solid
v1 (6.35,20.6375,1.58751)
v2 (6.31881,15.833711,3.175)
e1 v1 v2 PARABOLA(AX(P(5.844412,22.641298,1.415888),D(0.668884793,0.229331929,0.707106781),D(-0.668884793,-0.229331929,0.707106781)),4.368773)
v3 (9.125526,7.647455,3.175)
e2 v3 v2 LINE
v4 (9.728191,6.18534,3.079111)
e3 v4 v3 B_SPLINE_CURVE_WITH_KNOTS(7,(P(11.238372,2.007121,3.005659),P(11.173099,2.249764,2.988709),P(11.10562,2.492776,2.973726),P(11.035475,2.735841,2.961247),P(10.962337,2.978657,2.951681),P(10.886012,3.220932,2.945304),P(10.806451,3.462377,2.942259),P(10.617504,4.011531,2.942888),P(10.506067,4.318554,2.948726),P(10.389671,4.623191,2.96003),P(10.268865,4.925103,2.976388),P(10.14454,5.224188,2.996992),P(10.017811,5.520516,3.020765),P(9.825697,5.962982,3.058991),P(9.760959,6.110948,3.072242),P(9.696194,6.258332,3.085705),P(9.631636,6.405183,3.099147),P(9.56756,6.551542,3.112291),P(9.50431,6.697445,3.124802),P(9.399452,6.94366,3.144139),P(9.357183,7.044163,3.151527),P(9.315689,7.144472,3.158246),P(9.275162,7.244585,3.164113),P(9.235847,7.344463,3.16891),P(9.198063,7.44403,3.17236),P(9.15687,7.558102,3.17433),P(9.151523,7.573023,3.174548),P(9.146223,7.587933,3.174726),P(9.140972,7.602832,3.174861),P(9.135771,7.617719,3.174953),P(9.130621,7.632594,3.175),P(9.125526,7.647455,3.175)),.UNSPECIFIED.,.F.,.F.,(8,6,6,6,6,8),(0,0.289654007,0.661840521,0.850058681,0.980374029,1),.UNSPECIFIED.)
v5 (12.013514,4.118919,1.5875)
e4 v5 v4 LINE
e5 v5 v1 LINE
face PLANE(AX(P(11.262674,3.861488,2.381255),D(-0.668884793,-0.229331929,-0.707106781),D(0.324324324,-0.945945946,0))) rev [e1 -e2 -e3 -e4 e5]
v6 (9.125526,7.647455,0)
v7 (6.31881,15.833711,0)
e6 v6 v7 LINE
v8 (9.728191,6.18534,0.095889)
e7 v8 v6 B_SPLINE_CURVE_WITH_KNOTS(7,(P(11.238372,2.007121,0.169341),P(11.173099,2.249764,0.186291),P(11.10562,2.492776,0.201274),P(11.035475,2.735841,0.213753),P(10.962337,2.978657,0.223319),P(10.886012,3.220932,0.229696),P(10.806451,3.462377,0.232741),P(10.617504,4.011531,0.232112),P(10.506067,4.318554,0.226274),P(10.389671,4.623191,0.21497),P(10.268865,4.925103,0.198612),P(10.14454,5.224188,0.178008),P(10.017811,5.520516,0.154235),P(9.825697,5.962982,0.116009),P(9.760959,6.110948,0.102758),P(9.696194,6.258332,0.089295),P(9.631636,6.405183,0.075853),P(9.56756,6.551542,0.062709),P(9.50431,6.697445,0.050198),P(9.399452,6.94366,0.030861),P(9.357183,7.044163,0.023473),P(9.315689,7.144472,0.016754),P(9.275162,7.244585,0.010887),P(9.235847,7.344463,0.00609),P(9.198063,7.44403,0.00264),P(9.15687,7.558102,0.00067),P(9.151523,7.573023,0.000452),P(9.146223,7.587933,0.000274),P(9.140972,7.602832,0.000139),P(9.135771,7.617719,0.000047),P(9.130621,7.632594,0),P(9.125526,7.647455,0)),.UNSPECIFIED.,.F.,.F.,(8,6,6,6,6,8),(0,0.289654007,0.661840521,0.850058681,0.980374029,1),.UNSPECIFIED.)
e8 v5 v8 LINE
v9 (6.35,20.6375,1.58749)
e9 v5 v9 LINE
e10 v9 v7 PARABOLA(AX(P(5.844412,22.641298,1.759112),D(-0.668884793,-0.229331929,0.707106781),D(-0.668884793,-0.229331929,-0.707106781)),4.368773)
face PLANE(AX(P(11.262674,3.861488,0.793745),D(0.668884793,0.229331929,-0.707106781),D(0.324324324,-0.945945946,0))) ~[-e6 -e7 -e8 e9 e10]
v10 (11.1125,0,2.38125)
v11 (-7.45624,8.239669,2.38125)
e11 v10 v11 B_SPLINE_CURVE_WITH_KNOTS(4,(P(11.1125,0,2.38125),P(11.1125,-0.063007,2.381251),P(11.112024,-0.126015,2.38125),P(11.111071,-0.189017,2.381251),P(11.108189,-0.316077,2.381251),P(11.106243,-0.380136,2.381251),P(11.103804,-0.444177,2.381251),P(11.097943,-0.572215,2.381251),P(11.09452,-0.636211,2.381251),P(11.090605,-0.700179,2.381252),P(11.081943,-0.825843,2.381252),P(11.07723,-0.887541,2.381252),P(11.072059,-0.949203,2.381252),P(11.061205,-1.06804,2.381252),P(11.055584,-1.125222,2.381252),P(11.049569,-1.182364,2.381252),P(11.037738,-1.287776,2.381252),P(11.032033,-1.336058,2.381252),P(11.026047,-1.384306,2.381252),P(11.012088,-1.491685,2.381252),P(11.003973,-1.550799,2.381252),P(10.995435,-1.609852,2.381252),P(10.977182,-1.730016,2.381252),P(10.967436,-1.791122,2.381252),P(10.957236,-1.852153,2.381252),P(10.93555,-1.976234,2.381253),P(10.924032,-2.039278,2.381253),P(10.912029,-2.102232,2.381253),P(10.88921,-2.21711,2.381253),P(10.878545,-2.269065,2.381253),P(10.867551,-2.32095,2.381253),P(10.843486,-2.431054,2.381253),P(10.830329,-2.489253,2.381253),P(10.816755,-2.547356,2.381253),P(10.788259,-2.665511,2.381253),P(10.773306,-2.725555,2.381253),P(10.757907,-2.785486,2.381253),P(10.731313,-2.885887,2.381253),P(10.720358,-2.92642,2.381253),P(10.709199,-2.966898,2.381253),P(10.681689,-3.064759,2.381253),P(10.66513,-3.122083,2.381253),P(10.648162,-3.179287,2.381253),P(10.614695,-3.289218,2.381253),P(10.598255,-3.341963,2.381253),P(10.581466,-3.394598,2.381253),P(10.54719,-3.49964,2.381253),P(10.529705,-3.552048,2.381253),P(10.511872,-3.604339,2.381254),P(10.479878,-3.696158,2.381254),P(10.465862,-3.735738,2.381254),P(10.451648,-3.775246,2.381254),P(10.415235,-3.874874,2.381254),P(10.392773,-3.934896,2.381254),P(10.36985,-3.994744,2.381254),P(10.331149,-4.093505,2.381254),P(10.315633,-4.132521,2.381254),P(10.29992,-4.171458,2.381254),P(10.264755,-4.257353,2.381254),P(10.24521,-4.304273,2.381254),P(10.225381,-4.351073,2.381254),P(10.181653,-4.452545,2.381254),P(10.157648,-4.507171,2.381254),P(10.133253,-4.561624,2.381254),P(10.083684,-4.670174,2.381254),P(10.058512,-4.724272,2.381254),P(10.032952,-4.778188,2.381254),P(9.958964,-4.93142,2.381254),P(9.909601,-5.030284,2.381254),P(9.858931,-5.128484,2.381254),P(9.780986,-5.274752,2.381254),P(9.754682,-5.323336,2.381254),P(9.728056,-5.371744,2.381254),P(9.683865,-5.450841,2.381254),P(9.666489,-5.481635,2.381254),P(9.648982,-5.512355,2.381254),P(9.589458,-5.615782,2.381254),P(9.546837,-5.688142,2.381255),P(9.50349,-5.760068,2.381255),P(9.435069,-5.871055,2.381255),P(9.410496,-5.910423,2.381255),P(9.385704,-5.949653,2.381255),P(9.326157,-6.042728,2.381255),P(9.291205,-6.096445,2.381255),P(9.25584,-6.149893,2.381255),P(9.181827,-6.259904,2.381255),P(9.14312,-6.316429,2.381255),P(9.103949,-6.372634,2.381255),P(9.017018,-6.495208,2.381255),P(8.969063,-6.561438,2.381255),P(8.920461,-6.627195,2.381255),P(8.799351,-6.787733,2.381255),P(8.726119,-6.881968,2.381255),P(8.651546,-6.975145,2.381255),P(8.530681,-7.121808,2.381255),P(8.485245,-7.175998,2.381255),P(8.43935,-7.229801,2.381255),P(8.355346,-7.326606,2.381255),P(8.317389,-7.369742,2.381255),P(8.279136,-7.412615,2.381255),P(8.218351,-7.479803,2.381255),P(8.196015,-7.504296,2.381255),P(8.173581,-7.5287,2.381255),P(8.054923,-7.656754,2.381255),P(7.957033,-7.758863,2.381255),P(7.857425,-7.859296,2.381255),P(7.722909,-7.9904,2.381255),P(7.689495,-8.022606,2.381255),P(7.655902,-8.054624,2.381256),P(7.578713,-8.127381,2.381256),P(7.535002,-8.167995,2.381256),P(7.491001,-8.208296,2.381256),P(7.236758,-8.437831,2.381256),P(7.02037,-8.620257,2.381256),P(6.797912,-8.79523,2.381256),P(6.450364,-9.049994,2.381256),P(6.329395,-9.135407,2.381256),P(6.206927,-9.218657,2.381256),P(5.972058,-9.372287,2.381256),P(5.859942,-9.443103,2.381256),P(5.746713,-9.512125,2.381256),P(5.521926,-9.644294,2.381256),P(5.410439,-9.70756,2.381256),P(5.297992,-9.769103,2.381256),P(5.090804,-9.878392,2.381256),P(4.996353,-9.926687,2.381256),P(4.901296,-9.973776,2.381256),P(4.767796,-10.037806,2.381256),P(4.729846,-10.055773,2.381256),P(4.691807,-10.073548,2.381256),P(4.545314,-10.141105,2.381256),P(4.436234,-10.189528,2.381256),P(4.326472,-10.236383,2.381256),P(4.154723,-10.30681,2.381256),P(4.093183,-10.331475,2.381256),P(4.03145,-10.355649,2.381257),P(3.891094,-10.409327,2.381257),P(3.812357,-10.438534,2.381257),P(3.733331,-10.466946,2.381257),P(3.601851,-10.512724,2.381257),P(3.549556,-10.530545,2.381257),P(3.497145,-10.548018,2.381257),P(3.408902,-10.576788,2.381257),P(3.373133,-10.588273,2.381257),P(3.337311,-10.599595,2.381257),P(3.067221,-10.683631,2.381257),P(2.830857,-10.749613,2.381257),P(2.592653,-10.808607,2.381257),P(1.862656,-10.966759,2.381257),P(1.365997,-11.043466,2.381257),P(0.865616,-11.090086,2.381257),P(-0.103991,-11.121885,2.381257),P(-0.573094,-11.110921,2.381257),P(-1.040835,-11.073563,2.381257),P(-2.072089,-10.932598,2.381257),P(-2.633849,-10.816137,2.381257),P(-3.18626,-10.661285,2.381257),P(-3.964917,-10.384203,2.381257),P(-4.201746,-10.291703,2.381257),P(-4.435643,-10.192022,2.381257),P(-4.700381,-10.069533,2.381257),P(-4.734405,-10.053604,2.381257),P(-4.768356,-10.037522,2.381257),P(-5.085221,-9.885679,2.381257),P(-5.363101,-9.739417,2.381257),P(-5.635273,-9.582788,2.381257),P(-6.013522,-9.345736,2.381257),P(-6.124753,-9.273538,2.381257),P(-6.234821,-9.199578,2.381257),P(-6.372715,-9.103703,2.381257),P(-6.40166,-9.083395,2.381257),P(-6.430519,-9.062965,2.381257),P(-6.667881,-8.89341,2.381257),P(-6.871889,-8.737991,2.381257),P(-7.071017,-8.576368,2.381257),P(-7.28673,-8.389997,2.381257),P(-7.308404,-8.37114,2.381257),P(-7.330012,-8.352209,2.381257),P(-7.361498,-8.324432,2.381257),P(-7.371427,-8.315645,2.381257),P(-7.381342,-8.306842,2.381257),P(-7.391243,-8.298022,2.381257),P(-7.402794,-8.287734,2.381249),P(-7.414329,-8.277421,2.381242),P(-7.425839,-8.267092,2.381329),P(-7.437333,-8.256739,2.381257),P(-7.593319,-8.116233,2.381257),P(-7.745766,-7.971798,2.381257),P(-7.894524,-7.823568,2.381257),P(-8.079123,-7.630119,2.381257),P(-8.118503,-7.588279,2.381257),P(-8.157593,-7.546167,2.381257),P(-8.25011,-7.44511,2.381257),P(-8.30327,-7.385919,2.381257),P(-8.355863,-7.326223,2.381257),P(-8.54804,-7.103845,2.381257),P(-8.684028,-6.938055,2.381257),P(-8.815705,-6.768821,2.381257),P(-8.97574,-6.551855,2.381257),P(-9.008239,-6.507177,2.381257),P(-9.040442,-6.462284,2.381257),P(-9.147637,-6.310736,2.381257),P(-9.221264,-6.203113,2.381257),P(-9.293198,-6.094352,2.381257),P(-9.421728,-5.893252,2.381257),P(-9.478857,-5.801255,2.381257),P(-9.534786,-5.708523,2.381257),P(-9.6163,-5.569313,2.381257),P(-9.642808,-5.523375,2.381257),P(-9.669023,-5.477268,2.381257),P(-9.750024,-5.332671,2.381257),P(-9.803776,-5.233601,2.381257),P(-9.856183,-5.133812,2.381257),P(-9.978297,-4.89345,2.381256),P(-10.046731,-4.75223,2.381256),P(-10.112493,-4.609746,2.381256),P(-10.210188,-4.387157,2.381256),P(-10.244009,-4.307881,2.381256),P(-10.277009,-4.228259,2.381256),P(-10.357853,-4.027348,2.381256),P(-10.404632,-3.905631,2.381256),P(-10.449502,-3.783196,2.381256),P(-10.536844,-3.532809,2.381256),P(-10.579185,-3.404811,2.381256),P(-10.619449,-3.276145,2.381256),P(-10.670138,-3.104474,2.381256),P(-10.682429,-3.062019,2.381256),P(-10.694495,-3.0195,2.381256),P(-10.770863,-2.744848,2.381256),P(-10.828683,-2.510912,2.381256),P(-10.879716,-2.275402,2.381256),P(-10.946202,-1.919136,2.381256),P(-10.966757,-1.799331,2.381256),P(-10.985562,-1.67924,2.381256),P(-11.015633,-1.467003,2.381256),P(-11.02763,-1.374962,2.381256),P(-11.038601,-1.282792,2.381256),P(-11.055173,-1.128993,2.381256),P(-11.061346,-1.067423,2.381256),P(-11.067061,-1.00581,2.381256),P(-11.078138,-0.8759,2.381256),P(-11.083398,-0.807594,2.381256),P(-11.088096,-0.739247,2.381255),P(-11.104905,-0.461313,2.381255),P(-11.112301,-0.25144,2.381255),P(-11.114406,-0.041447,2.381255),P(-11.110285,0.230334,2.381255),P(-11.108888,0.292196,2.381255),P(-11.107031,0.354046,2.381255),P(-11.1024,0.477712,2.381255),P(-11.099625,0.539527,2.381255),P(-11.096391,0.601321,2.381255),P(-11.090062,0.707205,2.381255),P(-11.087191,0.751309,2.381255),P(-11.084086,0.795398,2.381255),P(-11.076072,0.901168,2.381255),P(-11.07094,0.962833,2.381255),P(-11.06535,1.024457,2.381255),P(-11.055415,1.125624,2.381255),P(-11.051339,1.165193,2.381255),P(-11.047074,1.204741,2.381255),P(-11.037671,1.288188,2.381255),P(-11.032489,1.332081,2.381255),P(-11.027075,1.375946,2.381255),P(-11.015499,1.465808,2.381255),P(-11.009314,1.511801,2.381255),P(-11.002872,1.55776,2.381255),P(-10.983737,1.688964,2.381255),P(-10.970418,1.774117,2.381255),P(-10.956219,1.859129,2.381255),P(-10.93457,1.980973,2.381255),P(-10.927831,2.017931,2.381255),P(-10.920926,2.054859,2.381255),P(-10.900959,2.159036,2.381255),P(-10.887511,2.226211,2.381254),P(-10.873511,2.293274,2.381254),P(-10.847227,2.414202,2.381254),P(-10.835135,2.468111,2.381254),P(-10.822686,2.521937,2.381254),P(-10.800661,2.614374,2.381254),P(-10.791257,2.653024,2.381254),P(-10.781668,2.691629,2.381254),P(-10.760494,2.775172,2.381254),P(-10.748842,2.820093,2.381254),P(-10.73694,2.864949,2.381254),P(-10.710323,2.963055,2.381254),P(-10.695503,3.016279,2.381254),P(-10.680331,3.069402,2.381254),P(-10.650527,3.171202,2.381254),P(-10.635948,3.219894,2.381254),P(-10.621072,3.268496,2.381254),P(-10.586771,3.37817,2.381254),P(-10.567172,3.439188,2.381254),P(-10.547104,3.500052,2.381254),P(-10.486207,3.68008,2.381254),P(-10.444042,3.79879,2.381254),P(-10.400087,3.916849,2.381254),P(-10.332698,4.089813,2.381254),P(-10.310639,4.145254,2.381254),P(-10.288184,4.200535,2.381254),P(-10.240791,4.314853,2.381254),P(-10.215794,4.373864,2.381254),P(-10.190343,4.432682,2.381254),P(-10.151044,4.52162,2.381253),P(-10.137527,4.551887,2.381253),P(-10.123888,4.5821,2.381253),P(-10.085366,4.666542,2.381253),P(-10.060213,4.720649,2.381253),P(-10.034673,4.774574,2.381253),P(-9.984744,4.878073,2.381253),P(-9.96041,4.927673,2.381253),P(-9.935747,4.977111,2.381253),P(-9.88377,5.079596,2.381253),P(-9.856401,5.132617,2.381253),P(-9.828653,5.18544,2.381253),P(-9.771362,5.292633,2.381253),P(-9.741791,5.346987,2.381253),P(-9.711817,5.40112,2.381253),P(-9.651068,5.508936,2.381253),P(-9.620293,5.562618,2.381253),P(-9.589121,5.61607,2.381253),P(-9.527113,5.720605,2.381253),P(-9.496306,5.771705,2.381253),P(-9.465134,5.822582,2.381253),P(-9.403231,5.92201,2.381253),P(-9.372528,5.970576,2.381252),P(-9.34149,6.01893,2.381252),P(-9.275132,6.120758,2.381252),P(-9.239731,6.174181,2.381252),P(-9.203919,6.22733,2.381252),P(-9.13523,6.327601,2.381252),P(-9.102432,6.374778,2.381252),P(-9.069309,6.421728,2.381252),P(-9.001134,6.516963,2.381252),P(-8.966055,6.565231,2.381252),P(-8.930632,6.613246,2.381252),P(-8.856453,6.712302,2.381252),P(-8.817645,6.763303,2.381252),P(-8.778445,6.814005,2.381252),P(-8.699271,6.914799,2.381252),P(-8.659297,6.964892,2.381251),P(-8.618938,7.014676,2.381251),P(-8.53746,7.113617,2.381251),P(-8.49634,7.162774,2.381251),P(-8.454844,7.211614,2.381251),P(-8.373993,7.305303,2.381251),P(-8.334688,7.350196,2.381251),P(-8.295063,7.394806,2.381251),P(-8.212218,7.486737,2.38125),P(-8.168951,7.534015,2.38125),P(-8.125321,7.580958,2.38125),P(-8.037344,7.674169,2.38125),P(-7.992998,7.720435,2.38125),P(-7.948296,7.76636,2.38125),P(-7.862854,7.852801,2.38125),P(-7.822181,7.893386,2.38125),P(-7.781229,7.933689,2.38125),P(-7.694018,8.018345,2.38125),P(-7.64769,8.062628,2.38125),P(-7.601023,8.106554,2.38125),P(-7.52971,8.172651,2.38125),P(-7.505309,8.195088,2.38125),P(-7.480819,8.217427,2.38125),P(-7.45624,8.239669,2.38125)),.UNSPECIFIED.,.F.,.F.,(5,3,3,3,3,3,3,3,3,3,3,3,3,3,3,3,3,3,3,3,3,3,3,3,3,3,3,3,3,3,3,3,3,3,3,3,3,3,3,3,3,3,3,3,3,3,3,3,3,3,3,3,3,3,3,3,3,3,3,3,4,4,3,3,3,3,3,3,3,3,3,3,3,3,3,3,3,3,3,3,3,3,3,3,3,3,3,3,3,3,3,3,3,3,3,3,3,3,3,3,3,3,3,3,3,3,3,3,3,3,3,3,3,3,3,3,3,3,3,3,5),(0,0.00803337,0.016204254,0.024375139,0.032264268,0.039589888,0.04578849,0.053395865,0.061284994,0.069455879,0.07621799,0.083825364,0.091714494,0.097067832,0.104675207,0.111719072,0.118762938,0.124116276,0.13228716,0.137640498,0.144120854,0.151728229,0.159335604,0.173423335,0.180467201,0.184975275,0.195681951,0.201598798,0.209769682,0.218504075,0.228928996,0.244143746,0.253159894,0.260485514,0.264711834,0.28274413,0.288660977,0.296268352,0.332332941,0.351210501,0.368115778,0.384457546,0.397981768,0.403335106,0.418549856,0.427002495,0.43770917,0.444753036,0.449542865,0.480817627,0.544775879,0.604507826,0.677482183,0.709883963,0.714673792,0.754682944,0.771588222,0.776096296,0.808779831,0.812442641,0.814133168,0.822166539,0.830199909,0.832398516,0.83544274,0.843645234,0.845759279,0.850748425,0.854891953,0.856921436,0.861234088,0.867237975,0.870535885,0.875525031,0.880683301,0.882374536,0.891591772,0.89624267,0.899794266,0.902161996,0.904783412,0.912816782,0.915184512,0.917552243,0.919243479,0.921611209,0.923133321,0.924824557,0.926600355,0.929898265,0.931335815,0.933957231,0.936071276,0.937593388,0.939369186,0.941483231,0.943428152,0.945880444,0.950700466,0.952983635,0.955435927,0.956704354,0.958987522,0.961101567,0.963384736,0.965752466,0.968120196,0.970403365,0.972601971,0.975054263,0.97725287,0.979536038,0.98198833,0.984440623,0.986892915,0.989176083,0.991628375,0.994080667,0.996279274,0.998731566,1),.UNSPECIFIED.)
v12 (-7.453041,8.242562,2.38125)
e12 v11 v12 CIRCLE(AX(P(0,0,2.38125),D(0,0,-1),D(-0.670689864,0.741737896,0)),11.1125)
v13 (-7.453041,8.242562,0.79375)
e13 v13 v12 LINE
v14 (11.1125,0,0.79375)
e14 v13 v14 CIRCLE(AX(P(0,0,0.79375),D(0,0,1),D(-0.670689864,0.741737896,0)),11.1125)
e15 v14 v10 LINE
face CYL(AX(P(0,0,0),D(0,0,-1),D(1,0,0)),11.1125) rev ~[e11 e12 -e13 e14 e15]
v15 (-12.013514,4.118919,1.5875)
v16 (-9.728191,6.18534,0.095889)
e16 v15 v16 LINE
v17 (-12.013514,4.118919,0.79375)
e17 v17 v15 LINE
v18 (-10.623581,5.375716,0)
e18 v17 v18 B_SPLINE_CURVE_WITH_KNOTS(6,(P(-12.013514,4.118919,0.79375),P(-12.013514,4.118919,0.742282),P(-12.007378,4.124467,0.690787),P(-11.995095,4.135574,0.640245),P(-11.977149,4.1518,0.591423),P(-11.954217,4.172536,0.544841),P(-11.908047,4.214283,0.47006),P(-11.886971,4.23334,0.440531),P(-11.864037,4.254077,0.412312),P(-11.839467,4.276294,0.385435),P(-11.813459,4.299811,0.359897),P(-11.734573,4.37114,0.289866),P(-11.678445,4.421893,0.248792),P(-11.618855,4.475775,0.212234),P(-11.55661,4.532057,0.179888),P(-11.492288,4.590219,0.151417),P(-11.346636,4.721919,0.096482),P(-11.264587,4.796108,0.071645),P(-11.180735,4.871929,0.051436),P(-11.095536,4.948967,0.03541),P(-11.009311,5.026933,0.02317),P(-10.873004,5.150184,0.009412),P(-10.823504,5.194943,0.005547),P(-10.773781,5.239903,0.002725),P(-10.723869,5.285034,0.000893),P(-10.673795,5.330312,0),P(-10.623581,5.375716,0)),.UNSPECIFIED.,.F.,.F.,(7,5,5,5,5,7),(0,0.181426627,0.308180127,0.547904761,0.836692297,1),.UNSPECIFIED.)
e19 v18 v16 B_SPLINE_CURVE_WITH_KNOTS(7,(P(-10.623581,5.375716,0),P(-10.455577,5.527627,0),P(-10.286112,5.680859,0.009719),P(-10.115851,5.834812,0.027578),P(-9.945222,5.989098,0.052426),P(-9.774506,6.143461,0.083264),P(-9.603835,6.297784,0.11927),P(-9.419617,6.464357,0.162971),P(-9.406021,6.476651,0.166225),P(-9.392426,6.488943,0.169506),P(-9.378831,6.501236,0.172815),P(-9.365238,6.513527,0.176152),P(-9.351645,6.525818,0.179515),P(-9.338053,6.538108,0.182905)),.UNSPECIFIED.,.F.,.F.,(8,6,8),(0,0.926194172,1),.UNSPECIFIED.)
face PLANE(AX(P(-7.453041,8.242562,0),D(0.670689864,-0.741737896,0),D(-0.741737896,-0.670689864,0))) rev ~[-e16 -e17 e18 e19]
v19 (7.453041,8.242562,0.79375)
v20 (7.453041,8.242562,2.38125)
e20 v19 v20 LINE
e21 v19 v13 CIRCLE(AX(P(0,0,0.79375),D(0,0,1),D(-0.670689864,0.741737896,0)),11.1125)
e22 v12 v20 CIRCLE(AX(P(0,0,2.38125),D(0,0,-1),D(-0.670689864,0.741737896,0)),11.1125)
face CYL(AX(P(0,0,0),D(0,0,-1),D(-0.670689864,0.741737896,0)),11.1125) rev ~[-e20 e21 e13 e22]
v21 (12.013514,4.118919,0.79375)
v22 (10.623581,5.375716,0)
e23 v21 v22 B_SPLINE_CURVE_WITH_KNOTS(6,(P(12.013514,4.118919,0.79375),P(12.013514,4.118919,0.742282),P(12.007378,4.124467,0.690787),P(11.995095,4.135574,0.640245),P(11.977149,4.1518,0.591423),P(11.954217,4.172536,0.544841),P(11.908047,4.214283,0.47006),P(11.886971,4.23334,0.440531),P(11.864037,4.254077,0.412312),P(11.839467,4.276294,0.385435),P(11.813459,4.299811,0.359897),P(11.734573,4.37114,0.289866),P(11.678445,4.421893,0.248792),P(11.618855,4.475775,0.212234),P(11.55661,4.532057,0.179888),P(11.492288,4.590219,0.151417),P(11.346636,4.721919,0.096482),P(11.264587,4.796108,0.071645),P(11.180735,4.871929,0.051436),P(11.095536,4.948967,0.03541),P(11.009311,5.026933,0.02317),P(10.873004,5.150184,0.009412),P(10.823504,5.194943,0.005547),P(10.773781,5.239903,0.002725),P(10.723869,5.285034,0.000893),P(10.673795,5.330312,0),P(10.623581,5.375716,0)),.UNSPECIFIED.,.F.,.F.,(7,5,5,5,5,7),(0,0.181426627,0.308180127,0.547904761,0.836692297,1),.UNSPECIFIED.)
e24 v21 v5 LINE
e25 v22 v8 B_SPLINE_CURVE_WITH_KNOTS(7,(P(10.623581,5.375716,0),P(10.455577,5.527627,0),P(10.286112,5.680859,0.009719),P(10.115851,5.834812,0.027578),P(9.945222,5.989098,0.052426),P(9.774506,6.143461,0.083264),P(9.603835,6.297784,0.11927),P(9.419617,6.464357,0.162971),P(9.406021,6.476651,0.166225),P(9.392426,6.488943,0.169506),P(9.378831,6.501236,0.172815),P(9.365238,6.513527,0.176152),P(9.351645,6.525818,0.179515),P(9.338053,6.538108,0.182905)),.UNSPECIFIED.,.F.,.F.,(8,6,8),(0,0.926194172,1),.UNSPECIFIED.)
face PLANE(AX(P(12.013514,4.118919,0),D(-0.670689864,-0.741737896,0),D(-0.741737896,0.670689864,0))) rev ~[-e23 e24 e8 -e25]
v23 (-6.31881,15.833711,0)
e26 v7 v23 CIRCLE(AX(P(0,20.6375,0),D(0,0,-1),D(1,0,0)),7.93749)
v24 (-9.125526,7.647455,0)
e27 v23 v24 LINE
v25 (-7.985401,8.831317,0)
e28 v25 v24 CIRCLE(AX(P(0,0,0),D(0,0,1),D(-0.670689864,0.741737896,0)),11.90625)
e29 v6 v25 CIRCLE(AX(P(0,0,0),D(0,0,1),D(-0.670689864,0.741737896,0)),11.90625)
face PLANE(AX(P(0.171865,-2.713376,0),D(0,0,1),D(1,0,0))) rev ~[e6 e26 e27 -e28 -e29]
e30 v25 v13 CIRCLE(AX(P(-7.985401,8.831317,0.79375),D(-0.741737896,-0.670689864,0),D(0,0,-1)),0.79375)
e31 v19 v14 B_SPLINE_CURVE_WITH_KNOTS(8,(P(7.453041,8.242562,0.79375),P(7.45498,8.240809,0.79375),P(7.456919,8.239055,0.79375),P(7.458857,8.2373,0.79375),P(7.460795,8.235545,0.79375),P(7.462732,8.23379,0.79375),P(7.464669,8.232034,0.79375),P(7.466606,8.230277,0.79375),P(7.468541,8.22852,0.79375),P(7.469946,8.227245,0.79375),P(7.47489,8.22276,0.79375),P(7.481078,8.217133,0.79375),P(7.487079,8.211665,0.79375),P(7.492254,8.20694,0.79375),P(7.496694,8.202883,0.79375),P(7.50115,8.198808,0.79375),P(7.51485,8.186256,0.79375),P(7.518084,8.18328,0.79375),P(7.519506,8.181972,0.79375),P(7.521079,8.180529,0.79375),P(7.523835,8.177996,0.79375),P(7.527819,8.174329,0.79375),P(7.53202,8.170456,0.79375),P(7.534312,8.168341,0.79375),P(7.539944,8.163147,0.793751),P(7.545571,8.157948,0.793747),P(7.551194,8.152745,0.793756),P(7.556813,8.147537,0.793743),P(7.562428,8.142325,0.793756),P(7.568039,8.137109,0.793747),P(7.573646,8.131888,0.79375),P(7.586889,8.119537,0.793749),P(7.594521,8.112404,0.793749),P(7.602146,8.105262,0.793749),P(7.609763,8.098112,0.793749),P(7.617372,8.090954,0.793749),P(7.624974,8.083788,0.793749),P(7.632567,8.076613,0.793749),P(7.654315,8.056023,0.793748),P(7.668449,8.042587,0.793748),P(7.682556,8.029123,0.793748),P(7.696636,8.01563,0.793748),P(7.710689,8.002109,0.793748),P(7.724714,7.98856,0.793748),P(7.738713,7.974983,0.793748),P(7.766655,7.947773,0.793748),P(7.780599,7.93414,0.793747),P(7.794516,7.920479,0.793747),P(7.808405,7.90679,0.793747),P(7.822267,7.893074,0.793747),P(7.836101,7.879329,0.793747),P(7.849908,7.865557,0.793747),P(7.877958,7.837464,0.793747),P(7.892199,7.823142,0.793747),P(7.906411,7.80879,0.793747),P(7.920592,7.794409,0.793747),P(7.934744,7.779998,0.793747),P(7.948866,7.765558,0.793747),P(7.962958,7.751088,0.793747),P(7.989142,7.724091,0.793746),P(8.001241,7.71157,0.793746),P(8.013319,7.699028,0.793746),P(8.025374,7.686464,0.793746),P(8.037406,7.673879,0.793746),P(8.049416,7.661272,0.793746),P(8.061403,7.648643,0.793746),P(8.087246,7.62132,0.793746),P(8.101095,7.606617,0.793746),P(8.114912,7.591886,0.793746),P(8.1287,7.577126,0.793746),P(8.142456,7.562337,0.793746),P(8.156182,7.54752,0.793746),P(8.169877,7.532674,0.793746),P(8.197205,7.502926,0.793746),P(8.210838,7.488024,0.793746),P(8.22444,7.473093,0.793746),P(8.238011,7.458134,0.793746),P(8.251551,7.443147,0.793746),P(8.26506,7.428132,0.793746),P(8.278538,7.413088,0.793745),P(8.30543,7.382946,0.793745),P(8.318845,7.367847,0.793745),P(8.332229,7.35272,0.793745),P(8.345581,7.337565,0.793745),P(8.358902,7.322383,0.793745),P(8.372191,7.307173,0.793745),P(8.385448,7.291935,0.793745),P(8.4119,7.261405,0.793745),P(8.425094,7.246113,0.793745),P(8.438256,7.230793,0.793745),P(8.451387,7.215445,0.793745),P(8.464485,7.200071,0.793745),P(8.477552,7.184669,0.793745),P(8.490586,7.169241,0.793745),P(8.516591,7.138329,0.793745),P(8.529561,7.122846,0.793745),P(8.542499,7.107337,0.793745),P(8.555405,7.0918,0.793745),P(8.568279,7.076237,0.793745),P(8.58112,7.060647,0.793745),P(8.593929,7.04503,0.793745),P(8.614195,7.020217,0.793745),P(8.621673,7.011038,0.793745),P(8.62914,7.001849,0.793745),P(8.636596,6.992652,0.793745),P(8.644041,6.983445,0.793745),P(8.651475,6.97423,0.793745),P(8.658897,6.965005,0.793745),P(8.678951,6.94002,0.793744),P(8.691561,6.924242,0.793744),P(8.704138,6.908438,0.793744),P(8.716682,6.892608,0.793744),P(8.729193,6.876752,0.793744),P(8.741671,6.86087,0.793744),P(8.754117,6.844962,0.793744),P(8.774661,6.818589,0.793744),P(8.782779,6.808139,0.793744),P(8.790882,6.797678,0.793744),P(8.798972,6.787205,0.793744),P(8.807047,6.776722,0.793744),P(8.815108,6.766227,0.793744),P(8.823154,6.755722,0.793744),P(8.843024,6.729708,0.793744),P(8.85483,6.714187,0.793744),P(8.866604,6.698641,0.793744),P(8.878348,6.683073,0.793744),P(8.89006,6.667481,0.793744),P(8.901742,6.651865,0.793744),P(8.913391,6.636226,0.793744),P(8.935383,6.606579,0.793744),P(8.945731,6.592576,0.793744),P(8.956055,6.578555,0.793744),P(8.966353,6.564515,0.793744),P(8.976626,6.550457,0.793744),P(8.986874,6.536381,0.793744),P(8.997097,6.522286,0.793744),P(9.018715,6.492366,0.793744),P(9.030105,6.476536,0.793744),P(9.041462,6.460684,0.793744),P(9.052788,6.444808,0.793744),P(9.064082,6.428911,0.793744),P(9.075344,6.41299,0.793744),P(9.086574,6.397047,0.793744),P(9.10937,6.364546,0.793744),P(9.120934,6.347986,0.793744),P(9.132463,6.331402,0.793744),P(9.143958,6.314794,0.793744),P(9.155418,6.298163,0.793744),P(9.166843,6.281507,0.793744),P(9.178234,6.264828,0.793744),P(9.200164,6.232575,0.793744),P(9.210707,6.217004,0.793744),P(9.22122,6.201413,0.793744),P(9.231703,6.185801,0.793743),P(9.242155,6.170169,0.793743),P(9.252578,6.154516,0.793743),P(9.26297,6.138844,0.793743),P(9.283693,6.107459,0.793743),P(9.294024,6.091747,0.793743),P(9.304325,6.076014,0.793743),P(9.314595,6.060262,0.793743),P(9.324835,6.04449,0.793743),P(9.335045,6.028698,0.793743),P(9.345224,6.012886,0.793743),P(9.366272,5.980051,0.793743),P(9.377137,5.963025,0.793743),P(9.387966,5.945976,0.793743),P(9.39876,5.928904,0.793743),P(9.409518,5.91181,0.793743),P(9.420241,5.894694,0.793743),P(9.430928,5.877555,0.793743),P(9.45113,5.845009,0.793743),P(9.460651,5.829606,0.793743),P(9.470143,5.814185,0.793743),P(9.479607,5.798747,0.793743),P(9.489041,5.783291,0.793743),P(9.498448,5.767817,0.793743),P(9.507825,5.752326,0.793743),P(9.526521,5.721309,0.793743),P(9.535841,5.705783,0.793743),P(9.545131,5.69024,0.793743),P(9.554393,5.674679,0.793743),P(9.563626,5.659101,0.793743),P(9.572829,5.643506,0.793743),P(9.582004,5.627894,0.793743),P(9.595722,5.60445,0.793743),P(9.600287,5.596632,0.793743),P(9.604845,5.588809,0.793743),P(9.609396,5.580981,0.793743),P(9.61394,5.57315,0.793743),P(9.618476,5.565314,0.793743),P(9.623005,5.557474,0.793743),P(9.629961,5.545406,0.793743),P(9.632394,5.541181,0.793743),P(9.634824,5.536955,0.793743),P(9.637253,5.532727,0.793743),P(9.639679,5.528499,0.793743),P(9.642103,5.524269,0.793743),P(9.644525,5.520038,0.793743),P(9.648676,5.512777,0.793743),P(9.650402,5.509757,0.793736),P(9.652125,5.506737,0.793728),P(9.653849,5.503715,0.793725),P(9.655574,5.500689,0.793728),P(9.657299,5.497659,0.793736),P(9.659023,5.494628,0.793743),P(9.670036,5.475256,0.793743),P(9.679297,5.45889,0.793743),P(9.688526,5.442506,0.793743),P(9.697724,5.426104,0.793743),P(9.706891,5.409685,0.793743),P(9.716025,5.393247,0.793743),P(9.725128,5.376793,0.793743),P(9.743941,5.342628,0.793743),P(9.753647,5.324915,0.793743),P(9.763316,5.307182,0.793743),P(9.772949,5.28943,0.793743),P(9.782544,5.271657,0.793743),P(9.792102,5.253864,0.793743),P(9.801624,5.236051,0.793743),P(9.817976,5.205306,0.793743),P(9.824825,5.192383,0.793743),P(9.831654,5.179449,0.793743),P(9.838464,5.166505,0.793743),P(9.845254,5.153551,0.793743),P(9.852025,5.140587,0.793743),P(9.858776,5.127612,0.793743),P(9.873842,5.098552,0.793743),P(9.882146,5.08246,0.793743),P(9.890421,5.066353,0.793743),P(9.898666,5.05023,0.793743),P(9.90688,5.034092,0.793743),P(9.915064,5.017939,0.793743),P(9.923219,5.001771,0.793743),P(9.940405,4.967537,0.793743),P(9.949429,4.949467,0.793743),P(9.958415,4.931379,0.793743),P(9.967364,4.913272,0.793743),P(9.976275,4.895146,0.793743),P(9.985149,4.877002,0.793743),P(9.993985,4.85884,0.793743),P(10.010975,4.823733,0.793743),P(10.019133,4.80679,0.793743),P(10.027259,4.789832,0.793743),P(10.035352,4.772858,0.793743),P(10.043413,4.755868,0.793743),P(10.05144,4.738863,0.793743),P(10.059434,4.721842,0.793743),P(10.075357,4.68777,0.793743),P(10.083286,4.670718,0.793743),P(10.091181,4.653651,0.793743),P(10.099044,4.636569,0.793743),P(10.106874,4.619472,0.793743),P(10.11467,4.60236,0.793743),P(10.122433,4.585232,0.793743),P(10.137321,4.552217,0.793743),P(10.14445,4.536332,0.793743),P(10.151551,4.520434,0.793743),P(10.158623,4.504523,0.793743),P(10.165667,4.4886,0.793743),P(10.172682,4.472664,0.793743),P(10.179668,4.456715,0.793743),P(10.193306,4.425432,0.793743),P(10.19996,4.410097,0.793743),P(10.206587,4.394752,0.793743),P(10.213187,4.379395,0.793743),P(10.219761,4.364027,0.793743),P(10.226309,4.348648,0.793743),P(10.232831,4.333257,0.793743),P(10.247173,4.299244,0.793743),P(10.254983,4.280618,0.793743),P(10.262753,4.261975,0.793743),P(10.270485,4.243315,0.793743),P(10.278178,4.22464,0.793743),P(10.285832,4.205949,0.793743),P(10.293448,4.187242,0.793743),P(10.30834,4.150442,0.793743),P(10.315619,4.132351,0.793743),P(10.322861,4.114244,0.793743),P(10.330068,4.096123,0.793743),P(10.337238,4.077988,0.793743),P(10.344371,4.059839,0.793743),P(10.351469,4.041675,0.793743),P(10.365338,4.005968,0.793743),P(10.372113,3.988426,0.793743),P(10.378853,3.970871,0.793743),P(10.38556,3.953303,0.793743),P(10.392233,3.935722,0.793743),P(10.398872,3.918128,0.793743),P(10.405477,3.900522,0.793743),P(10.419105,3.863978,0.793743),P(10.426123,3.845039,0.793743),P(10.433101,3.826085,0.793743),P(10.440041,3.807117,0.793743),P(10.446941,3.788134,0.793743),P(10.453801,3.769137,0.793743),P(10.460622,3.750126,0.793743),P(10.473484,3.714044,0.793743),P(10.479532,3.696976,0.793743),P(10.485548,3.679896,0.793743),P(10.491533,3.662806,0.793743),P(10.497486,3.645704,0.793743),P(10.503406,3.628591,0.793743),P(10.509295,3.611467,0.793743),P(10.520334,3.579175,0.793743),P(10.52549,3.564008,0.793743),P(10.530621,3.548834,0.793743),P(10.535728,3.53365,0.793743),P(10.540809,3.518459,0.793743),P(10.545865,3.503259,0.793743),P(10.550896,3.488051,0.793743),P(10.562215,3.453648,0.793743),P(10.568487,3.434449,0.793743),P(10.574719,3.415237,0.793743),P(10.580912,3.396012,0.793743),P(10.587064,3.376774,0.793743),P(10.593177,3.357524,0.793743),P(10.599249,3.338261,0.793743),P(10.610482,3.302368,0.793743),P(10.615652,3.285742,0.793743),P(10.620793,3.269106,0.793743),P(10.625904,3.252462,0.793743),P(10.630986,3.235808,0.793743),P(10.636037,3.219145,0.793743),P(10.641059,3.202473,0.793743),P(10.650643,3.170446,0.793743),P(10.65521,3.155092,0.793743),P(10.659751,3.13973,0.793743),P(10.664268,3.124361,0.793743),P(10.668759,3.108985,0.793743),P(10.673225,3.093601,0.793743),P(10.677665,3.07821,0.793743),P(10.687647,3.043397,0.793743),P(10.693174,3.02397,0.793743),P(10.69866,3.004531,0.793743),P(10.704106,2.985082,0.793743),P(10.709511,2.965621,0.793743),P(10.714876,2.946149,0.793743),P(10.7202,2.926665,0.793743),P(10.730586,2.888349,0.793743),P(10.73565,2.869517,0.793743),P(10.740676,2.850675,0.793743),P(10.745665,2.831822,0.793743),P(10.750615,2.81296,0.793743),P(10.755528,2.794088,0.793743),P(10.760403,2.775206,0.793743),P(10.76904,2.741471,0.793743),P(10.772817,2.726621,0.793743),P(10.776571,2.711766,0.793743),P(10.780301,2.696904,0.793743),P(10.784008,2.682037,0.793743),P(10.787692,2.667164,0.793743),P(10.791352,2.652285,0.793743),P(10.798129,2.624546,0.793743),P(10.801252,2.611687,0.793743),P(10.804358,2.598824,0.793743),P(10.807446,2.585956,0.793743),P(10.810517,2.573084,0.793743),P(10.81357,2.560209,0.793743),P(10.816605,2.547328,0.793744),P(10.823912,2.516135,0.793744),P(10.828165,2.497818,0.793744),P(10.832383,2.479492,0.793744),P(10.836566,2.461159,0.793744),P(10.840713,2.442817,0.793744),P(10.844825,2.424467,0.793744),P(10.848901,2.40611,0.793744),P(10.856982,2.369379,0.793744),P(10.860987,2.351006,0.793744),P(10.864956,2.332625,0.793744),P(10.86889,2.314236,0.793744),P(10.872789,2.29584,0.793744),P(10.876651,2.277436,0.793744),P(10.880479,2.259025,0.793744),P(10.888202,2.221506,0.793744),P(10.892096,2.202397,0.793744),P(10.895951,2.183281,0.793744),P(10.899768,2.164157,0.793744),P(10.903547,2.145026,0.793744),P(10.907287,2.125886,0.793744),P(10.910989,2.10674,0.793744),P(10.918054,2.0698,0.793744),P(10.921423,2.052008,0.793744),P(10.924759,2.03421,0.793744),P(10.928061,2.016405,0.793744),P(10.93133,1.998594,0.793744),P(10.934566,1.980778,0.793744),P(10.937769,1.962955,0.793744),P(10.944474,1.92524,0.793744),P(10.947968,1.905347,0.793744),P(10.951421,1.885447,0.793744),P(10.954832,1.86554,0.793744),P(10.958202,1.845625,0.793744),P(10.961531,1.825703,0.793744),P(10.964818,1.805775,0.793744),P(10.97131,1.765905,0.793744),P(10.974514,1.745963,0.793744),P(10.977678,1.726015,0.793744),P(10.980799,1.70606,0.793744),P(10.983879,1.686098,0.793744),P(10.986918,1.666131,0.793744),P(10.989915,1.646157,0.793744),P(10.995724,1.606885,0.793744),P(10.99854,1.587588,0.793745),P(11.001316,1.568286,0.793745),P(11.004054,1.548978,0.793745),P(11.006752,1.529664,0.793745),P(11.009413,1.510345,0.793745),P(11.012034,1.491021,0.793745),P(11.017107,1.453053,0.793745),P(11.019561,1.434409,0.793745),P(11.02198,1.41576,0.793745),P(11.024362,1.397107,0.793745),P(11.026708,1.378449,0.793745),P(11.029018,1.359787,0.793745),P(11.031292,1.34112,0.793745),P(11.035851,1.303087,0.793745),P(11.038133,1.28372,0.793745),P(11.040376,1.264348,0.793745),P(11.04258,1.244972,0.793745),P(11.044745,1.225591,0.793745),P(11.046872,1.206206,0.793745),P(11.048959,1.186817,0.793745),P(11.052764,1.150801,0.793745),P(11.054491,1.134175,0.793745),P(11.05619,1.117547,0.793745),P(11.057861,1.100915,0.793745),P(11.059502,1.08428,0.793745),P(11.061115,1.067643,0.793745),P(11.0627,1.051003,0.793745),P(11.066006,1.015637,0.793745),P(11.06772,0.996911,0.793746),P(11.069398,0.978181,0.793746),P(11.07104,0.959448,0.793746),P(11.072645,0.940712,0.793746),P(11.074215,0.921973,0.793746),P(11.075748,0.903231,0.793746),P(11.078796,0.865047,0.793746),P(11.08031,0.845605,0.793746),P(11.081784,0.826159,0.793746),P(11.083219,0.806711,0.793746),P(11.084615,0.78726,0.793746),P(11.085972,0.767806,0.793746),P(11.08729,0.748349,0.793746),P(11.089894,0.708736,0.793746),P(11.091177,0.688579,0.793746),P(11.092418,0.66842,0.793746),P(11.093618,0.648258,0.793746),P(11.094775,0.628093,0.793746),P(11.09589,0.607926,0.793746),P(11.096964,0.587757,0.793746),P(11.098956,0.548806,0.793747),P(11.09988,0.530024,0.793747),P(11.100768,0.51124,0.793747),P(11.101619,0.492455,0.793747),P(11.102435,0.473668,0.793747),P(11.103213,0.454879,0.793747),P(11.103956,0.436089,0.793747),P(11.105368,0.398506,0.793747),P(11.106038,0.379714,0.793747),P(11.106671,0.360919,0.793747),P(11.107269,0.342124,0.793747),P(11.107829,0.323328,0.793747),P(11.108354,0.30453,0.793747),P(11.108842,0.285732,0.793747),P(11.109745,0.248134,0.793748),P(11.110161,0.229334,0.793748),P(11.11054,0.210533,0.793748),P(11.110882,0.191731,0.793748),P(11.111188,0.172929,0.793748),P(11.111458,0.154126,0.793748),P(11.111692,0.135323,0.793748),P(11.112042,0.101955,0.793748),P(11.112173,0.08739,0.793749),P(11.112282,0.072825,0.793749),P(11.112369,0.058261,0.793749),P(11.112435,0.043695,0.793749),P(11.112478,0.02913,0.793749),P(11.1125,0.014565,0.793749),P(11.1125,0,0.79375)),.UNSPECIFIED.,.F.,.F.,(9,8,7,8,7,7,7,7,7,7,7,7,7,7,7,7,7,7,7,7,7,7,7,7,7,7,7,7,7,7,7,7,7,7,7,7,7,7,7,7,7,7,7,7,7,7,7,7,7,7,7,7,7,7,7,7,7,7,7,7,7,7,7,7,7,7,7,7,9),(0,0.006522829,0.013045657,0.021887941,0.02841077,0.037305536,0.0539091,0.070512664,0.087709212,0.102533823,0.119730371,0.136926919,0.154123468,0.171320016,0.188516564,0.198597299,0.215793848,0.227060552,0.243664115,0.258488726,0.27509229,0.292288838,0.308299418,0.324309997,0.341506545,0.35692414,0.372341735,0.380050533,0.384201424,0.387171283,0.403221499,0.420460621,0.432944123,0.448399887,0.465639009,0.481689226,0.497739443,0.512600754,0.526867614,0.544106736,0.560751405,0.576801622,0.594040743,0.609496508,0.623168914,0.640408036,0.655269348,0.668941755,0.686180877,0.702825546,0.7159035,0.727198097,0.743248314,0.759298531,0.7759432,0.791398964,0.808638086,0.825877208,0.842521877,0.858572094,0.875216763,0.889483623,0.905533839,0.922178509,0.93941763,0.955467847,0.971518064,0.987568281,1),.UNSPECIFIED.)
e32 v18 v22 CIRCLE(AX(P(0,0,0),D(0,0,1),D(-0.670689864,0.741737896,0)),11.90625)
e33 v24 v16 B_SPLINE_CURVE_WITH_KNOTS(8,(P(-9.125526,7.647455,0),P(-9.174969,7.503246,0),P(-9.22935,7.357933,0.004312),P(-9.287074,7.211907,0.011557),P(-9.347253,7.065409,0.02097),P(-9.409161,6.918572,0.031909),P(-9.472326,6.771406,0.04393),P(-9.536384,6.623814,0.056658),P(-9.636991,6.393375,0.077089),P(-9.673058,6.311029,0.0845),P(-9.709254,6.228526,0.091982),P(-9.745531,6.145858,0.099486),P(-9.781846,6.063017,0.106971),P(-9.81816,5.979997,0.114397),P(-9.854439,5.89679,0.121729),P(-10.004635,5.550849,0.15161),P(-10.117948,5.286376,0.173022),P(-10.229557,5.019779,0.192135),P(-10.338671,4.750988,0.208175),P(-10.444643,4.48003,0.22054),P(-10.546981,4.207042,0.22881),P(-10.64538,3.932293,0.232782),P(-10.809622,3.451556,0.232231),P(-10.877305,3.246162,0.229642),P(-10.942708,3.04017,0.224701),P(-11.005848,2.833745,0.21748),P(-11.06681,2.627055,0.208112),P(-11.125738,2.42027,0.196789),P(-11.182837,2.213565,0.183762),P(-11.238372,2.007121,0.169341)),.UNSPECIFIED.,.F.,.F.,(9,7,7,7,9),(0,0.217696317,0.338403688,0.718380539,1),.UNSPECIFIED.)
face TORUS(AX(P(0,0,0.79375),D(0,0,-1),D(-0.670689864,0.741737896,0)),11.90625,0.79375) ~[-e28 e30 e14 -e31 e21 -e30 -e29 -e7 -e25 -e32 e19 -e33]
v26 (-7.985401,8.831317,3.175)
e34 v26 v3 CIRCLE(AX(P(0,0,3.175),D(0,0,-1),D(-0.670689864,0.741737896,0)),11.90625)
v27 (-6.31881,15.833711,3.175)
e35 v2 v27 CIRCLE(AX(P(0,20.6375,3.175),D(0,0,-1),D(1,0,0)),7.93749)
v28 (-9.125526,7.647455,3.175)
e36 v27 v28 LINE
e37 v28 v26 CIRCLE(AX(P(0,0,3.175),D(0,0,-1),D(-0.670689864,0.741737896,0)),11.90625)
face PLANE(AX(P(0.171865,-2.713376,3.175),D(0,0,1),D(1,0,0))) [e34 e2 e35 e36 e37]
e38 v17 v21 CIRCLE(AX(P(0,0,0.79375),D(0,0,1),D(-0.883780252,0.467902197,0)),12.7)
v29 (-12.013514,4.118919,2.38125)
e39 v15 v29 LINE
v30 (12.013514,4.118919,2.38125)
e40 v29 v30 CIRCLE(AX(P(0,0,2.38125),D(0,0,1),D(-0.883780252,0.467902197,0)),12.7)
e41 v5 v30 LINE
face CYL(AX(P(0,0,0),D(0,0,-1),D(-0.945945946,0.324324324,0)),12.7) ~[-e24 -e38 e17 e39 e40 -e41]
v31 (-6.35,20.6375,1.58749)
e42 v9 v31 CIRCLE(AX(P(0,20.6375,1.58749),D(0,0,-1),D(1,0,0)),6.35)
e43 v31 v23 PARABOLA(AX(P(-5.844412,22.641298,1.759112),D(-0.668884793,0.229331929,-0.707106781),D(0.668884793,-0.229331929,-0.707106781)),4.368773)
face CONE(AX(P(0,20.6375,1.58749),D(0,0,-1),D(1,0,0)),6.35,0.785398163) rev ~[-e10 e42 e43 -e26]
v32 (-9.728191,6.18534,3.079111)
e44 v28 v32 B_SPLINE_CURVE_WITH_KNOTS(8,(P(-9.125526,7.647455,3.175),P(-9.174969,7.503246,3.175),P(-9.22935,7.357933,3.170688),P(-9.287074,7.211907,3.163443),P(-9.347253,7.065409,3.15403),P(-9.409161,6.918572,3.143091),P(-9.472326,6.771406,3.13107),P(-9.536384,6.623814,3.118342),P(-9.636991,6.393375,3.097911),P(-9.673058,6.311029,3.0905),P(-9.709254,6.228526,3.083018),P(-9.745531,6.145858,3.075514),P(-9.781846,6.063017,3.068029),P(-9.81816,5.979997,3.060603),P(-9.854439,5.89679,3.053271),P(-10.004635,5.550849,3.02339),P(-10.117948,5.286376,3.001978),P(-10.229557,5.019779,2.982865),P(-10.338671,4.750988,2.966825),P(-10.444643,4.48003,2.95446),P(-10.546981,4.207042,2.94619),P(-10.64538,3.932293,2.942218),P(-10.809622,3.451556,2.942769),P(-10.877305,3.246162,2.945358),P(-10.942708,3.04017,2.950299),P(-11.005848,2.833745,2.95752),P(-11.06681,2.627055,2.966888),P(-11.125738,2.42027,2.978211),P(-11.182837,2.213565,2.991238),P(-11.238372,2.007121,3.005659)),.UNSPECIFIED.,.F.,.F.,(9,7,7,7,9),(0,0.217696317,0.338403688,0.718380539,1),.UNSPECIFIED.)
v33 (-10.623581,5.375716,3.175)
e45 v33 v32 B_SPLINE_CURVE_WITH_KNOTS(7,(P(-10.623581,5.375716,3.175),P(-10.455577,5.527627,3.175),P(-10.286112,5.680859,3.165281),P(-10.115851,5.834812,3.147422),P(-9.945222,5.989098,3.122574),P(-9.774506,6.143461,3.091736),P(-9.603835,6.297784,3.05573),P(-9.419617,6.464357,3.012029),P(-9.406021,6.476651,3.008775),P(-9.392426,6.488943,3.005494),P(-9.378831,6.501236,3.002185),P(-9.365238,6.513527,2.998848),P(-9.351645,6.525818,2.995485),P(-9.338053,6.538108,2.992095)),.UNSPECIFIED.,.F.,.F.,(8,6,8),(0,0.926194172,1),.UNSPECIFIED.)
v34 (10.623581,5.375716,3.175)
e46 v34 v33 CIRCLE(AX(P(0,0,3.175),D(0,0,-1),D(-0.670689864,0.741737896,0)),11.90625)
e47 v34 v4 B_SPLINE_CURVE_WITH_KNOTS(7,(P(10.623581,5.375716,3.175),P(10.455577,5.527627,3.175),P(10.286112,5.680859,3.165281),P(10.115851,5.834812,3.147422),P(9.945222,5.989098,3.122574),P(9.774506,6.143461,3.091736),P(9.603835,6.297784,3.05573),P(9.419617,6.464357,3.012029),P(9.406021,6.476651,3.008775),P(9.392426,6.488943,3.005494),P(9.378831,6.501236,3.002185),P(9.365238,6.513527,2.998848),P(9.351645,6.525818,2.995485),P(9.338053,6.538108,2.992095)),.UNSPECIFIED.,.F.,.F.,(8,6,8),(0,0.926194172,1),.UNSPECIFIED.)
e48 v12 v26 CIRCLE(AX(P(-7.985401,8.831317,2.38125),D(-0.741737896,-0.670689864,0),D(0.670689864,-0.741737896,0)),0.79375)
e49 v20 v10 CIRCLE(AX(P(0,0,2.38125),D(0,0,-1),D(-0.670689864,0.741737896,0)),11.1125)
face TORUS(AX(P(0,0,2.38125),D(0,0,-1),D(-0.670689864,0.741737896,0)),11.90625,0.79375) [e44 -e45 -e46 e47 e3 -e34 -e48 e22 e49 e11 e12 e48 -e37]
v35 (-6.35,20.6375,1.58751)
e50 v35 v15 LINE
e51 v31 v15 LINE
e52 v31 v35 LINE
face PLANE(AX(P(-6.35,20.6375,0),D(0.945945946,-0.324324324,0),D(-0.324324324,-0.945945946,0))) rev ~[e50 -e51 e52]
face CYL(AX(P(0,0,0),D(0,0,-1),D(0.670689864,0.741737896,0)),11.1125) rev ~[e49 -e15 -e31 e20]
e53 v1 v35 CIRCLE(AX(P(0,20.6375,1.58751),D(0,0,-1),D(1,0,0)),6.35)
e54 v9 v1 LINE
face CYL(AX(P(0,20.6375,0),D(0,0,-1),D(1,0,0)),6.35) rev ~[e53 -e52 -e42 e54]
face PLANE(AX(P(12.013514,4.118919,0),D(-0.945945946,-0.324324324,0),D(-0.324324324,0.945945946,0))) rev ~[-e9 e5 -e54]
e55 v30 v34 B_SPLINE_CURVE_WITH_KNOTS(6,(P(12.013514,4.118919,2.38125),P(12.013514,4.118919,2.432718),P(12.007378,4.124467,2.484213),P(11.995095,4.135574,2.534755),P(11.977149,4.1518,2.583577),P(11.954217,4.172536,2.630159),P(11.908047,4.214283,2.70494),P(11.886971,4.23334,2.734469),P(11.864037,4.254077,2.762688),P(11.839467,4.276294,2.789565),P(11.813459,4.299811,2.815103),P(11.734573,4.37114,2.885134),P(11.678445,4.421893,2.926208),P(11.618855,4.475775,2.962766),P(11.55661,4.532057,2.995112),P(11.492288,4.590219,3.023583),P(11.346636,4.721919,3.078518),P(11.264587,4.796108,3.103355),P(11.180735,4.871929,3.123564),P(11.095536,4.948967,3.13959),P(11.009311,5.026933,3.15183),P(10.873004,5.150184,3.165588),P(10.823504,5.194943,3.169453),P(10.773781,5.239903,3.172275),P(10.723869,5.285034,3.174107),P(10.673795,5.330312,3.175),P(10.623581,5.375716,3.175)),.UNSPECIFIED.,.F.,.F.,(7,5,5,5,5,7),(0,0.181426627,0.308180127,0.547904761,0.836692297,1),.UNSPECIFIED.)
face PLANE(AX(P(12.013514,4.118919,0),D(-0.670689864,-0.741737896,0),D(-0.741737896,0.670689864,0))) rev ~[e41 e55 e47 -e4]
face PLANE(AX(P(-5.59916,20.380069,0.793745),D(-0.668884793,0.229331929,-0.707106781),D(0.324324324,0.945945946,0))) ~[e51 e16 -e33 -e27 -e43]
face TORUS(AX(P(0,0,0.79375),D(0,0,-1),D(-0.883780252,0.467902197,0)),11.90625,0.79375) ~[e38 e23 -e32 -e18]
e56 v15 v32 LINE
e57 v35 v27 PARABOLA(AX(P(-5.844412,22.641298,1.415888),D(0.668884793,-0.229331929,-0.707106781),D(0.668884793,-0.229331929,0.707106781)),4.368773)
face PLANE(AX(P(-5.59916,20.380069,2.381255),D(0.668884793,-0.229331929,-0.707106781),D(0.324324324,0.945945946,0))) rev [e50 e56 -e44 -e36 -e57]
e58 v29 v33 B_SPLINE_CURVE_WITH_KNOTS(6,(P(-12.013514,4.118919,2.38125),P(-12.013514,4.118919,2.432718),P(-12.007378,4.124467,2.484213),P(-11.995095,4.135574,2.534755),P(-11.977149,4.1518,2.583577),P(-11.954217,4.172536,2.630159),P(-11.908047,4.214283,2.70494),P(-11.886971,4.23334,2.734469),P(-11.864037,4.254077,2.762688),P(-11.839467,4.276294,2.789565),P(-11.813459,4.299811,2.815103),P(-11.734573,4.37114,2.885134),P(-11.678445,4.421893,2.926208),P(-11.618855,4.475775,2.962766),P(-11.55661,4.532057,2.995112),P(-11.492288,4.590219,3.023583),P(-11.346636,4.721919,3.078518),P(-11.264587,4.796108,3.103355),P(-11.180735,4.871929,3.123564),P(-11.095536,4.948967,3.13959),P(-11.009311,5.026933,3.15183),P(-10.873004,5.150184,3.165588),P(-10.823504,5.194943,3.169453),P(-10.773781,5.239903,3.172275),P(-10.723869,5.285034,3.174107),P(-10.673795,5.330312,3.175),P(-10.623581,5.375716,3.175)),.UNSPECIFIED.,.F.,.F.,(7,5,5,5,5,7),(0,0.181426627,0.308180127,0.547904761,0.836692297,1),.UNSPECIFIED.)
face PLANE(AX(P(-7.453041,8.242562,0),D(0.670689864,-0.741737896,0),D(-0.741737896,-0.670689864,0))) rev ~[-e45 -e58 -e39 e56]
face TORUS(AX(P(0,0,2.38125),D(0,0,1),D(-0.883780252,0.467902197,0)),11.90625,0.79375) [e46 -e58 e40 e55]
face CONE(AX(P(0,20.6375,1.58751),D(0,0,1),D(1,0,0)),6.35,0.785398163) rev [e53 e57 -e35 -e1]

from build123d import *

# Parameters (mm, degrees)
F1_DEPTH    = 3.175
F2_SIZE     = 1.58749
F3_DEPTH    = 3.175
F4_T6_ANGLE = 235.7964191348
F4_T8_ANGLE = 235.7964191348


# Not quite as in the source:
# - a fillet or chamfer that OpenCascade refuses, or shapes differently, is made with other operations: its cross-section is extruded or revolved along the edge and cut away or added
# - a fillet or chamfer is up to 0.001 mm smaller than in the source, because OpenCascade refuses the exact size


with BuildPart() as f1:
    # F0 (on Top) → F1 (new body)
    with BuildSketch(Plane.XY):
        with BuildLine():
            ThreePointArc((-7.4530411175, 8.2425623656), (0, 11.1125), (7.4530411175, 8.2425623656))
            Line((7.4530411175, 8.2425623656), (12.0135135135, 4.1189189189))
            Line((12.0135135135, 4.1189189189), (6.35, 20.6375))
            ThreePointArc((6.35, 20.6375), (0, 14.2875), (-6.35, 20.6375))
            Line((-6.35, 20.6375), (-12.0135135135, 4.1189189189))
            Line((-12.0135135135, 4.1189189189), (-7.4530411175, 8.2425623656))
        make_face()
    extrude(amount=F1_DEPTH)

    # F2 (size 1.5875 in the source; OpenCascade refuses exactly that, so slightly less here)
    f2_edges = [f1.edges().sort_by_distance(p)[0] for p in [
        (-9.181757, 12.378209, 3.175),
        (-9.181757, 12.378209, 0),
        (0, 14.2875, 0),
        (0, 14.2875, 3.175),
        (9.181757, 12.378209, 3.175),
        (9.181757, 12.378209, 0),
    ]]
    chamfer(f2_edges, length=F2_SIZE)

    # F0 (on Top) → F3 (join)
    with BuildSketch(Plane.XY):
        with BuildLine():
            ThreePointArc((7.4530411175, 8.2425623656), (10.1565145515, 4.509198201), (11.1125, 0))
            ThreePointArc((11.1125, 0), (-4.509198201, -10.1565145515), (-7.4530411175, 8.2425623656))
            Line((-7.4530411175, 8.2425623656), (-12.0135135135, 4.1189189189))
            ThreePointArc((-12.0135135135, 4.1189189189), (0, -12.7), (12.0135135135, 4.1189189189))
            Line((12.0135135135, 4.1189189189), (7.4530411175, 8.2425623656))
        make_face()
    extrude(amount=F3_DEPTH)

    # F4: fillet of radius 0.79375 on 4 edges, made by hand

    # F4_s1 → F4_t2 (revolve, cut)
    with BuildSketch(Plane(origin=(0, 0, 0), x_dir=(0, 0, 1), z_dir=(-0.7417378957, -0.6706898643, 0))):
        with BuildLine():
            ThreePointArc((2.38125, 11.1125), (2.9425160076, 11.3449839924), (3.175, 11.90625))
            Line((3.175, 11.90625), (3.175, 11.1125))
            Line((3.175, 11.1125), (2.38125, 11.1125))
        make_face()
    revolve(axis=Axis((0, 0, 3.175), (0, 0, -1)), mode=Mode.SUBTRACT)

    # F4_s3 → F4_t4 (revolve, cut)
    with BuildSketch(Plane(origin=(0, 0, 0), x_dir=(0, 0, 1), z_dir=(0.7417378957, 0.6706898643, 0))):
        with BuildLine():
            ThreePointArc((0, -11.90625), (0.2324839924, -11.3449839924), (0.79375, -11.1125))
            Line((0.79375, -11.1125), (0, -11.1125))
            Line((0, -11.1125), (0, -11.90625))
        make_face()
    revolve(axis=Axis((0, 0, 0), (0, 0, 1)), mode=Mode.SUBTRACT)

    # F4_s5 → F4_t6 (revolve, cut)
    with BuildSketch(Plane(origin=(0, 0, 0), x_dir=(0, 0, 1), z_dir=(0.4679021973, 0.883780252, 0))):
        with BuildLine():
            ThreePointArc((0.79375, -12.7), (0.2324839924, -12.4675160076), (0, -11.90625))
            Line((0, -11.90625), (0, -12.7))
            Line((0, -12.7), (0.79375, -12.7))
        make_face()
    revolve(axis=Axis((0, 0, 0), (0, 0, 1)), revolution_arc=F4_T6_ANGLE, mode=Mode.SUBTRACT)

    # F4_s7 → F4_t8 (revolve, cut)
    with BuildSketch(Plane(origin=(0, 0, 0), x_dir=(0, 0, 1), z_dir=(0.4679021973, 0.883780252, 0))):
        with BuildLine():
            ThreePointArc((2.38125, -12.7), (2.9425160076, -12.4675160076), (3.175, -11.90625))
            Line((3.175, -11.90625), (3.175, -12.7))
            Line((3.175, -12.7), (2.38125, -12.7))
        make_face()
    revolve(axis=Axis((0, 0, 3.175), (0, 0, 1)), revolution_arc=F4_T8_ANGLE, mode=Mode.SUBTRACT)


solid = f1.part
